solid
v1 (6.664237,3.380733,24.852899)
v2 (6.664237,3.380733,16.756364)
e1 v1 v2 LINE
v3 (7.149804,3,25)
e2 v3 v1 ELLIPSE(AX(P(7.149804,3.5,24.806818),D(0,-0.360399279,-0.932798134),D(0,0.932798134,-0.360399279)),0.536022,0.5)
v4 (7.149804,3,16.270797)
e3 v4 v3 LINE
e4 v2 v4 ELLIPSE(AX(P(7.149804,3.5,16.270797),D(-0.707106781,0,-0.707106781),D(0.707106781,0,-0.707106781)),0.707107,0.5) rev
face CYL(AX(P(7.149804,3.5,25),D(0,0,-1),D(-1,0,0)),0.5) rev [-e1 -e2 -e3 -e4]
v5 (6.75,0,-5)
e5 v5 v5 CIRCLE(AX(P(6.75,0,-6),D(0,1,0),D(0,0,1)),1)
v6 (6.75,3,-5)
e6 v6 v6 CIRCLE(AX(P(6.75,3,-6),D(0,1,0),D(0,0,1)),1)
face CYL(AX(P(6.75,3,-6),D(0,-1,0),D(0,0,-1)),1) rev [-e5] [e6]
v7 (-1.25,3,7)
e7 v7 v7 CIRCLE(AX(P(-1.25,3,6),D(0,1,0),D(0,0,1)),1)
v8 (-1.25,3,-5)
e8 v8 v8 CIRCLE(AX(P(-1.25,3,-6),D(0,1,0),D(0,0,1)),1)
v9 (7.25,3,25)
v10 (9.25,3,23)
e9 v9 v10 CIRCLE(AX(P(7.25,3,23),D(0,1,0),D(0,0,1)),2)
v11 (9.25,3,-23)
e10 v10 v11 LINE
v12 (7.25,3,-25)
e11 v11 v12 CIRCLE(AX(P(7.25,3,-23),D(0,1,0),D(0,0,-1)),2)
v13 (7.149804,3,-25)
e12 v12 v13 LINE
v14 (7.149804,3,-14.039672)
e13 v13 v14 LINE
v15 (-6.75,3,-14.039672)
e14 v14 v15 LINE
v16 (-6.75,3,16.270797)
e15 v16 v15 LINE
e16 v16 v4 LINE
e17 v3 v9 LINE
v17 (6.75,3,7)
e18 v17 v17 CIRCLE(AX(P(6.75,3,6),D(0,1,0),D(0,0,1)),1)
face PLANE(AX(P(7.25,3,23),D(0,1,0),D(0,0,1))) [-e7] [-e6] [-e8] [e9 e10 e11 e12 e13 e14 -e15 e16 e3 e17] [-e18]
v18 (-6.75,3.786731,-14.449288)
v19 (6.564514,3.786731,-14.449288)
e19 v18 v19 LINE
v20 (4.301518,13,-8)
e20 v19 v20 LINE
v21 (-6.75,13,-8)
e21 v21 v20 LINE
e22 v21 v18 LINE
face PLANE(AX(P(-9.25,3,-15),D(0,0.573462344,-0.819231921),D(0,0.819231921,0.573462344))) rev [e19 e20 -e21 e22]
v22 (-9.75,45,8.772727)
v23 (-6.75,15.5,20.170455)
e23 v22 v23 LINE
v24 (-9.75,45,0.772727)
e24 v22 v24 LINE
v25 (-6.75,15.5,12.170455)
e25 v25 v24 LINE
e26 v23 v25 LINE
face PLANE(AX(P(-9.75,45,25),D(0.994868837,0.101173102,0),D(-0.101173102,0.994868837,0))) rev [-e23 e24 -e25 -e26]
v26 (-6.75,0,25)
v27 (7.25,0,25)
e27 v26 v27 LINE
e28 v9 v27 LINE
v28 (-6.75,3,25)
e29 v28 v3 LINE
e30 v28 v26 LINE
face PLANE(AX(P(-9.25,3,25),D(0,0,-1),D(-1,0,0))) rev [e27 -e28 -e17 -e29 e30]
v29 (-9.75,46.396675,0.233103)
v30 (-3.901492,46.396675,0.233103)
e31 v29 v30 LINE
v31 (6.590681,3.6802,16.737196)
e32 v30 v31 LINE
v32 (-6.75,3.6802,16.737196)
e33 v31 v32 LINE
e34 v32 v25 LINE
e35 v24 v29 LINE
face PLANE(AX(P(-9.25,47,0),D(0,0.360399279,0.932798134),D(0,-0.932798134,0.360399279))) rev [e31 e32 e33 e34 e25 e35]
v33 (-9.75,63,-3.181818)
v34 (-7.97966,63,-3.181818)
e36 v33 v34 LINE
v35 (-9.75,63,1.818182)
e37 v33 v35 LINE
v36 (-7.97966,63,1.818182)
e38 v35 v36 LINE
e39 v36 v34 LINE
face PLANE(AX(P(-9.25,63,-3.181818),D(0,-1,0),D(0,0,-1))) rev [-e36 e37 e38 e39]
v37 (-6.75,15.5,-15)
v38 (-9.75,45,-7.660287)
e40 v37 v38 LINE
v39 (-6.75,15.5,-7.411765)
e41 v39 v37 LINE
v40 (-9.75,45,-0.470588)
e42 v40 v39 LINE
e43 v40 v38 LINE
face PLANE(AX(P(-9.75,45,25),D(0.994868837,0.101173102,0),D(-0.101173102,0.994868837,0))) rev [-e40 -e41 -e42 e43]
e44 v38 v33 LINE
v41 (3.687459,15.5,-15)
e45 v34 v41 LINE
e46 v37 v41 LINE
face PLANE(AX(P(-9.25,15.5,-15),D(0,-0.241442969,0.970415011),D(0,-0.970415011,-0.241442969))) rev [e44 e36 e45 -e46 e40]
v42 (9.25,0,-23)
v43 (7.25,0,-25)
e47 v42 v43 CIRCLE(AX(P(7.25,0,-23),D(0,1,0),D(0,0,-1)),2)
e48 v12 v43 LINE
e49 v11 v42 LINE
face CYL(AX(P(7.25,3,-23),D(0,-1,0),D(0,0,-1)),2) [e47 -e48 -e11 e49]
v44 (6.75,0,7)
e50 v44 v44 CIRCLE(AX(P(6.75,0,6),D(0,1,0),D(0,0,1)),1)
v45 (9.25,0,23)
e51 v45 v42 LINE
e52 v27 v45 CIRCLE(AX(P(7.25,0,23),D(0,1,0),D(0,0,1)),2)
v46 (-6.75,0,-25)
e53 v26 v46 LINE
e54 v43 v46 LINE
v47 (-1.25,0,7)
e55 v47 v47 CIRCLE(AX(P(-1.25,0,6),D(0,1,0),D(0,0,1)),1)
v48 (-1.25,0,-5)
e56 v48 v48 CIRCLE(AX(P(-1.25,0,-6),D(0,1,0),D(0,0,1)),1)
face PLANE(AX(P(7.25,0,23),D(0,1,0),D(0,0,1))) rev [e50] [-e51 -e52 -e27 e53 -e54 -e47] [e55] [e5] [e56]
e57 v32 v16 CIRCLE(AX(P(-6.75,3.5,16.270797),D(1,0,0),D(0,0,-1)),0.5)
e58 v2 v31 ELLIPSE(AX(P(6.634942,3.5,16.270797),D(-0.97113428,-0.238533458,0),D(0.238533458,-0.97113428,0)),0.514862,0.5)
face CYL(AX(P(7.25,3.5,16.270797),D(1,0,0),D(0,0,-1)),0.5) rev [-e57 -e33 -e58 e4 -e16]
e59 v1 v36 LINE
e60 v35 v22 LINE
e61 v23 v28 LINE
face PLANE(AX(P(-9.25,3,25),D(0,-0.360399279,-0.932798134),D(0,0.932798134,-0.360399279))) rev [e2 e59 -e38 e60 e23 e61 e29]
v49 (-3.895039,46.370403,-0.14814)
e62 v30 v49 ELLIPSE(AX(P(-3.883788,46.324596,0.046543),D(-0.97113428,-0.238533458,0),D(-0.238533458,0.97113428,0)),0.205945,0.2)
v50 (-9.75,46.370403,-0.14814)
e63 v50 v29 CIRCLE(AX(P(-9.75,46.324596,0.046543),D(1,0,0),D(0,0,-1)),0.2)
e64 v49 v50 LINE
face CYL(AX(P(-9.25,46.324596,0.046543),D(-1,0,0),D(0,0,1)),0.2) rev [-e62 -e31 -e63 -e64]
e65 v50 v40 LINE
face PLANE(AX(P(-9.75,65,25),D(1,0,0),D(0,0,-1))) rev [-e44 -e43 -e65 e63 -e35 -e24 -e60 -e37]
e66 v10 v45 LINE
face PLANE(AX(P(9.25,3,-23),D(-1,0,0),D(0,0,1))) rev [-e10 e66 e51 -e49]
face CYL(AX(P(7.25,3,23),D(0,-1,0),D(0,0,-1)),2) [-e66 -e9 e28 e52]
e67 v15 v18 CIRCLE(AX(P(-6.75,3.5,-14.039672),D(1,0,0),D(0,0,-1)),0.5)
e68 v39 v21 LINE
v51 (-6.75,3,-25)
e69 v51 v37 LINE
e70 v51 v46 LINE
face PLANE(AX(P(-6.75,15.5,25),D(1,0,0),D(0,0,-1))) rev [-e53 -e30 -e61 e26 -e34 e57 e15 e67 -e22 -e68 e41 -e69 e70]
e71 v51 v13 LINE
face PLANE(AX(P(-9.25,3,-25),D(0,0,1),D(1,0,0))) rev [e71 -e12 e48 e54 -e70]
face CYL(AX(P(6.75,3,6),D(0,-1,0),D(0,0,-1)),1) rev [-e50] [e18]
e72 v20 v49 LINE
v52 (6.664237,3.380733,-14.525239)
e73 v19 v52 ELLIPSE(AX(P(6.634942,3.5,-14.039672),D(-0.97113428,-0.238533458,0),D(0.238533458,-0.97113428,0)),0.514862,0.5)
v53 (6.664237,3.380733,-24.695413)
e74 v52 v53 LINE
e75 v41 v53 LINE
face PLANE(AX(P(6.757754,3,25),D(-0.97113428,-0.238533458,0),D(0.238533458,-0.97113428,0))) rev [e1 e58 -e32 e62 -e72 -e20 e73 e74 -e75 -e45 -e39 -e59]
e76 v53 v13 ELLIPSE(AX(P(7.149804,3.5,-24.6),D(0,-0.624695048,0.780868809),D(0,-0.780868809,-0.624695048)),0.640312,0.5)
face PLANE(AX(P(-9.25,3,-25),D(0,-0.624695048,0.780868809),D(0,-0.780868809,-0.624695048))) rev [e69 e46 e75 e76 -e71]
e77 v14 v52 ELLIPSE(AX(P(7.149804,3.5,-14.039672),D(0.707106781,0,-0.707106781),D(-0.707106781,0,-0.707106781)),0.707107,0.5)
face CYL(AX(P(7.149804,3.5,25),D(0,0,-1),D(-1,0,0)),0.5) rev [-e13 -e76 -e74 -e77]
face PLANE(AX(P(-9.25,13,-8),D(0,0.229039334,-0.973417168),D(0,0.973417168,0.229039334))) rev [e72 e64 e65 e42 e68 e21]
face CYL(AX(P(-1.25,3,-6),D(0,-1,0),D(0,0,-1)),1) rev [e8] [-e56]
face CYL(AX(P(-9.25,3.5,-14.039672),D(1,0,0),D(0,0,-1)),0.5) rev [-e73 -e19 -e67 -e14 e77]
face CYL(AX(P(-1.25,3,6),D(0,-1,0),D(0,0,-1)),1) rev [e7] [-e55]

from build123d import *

# Parameters (mm, degrees)
SKETCH_1_R          = 1
EXTRUDE_1_DEPTH     = 3
SKETCH_2_W          = 16.007753667
SKETCH_2_H          = 50
EXTRUDE_2_DEPTH     = 80
CUT_EXTRUDE_1_DEPTH = 89.149011211
CUT_EXTRUDE_2_DEPTH = 81.960252593
EXTRUDE_3_DEPTH     = 3
CUT_EXTRUDE_3_DEPTH = 82.357621032
FILLET_1_R          = 0.5
FILLET_2_R          = 0.2


with BuildPart() as part:
    # 草图1 → 凸台-拉伸1 (new body)
    with BuildSketch(Plane(origin=(0, 0, 0), x_dir=(1, 0, 0), z_dir=(0, 1, 0))):
        with BuildLine():
            Line((-9.25, 25), (7.25, 25))
            ThreePointArc((7.25, 25), (8.664213562, 24.414213562), (9.25, 23))
            Line((9.25, 23), (9.25, -23))
            ThreePointArc((9.25, -23), (8.664213562, -24.414213562), (7.25, -25))
            Line((7.25, -25), (-9.25, -25))
            Line((-9.25, -25), (-9.25, 25))
        make_face()
        with Locations(Location((-1.25, 6, 0), (0, 0, 270))):
            Circle(SKETCH_1_R, mode=Mode.SUBTRACT)
        with Locations(Location((-1.25, -6, 0), (0, 0, 270))):
            Circle(SKETCH_1_R, mode=Mode.SUBTRACT)
        with Locations(Location((6.75, -6, 0), (0, 0, 270))):
            Circle(SKETCH_1_R, mode=Mode.SUBTRACT)
        with Locations(Location((6.75, 6, 0), (0, 0, 270))):
            Circle(SKETCH_1_R, mode=Mode.SUBTRACT)
    extrude(amount=EXTRUDE_1_DEPTH)

    # 草图2 → 凸台-拉伸2 (add)
    with BuildSketch(Plane(origin=(0, 3, 0), x_dir=(1, 0, 0), z_dir=(0, 1, 0))):
        with Locations((-1.246123166, 0)):
            Rectangle(SKETCH_2_W, SKETCH_2_H)
    extrude(amount=EXTRUDE_2_DEPTH)

    # 草图3 → 切除-拉伸1 (cut, through all)
    with BuildSketch(Plane(origin=(6.757753667, 0, 0), x_dir=(0, 0, -1), z_dir=(1, 0, 0))):
        Polygon((0, 47), (-17, 3), (15, 3), (8, 13), align=None)
        Polygon((25, 3), (15, 15.5), (3.181818182, 63), (-1.818181818, 63), (-25, 3), (-37.679958822, 3), (-37.679958822, 88.436899398), (63.328418147, 88.436899398), (63.328418147, 3), align=None)
    extrude(amount=-CUT_EXTRUDE_1_DEPTH, mode=Mode.SUBTRACT)

    # 草图4 → 切除-拉伸2 (cut, through all)
    with BuildSketch(Plane(origin=(0, 0, -25), x_dir=(-1, 0, 0), z_dir=(0, 0, -1))):
        Polygon((-6.757753667, 3), (8.40756476, 64.742116762), (-6.757753667, 64.742116762), align=None)
    extrude(amount=-CUT_EXTRUDE_2_DEPTH, mode=Mode.SUBTRACT)

    # 草图5 → 凸台-拉伸3 (add)
    with BuildSketch(Plane.ZY.offset(9.25)):
        Polygon((-3.181818182, 63), (-15, 15.5), (-25, 3), (-25, 0), (25, 0), (25, 3), (1.818181818, 63), align=None)
        Polygon((0, 47), (-8, 13), (-15, 3), (17, 3), align=None, mode=Mode.SUBTRACT)
    extrude(amount=EXTRUDE_3_DEPTH)

    # 草图6 → 切除-拉伸3 (cut, through all)
    with BuildSketch(Plane(origin=(0, 0, -25), x_dir=(-1, 0, 0), z_dir=(0, 0, -1))):
        Polygon((9.75, 65), (9.75, 45), (6.75, 15.5), (6.75, 0), (15.065136108, 0), (15.065136108, 65), align=None)
    extrude(amount=-CUT_EXTRUDE_3_DEPTH, mode=Mode.SUBTRACT)

    # 圆角1
    # the kernel refuses this fillet: 0.5 mm, written as the material it adds along each edge
    with BuildSketch(Plane(origin=(-6.75, 3, 17), x_dir=(0, 0, -1), z_dir=(1, 0, 0))) as fillet_1_piece_1_section:
        with BuildLine():
            CenterArc((FILLET_1_R * 1.45840694682, FILLET_1_R), FILLET_1_R, 158.875280854, 111.124719146)
            Line((FILLET_1_R * 0.525608812419, FILLET_1_R * 1.3603992792), (0, 0))
            Line((0, 0), (FILLET_1_R * 1.45840694682, 0))
        make_face()
    fillet_1_piece_1 = extrude(amount=15.33076235, mode=Mode.PRIVATE)
    fillet_1_piece_1 = split(fillet_1_piece_1, bisect_by=Plane(origin=(6.334852861, 4.721743663, 16.763347765), z_dir=(-0.9711342799096352, -0.23853345757858446, 0)), keep=Keep.TOP, mode=Mode.PRIVATE)
    add(fillet_1_piece_1)
    with BuildSketch(Plane(origin=(9.158573119, 3, -15), x_dir=(0, 0, 1), z_dir=(-1, 0, 0))) as fillet_1_piece_2_section:
        with BuildLine():
            CenterArc((FILLET_1_R * 1.92065556157, FILLET_1_R), FILLET_1_R, 145.007979801, 124.992020199)
            Line((FILLET_1_R * 1.10142364105, FILLET_1_R * 1.57346234436), (0, 0))
            Line((0, 0), (FILLET_1_R * 1.92065556157, 0))
        make_face()
    fillet_1_piece_2 = extrude(amount=15.908573119, mode=Mode.PRIVATE)
    fillet_1_piece_2 = split(fillet_1_piece_2, bisect_by=Plane(origin=(6.326718063, 4.754862629, -14.622728055), z_dir=(-0.9711342799096352, -0.23853345757858446, 0)), keep=Keep.TOP, mode=Mode.PRIVATE)
    add(fillet_1_piece_2)
    with BuildSketch(Plane(origin=(6.757753667, 3, 16.019874802), x_dir=(1, 0, 0), z_dir=(0, 0, 1))) as fillet_1_piece_3_section:
        with BuildLine():
            CenterArc((FILLET_1_R * 0.784100158108, FILLET_1_R), FILLET_1_R, 193.8, 76.2)
            Line((-FILLET_1_R * 0.187034121801, FILLET_1_R * 0.761466542421), (0, 0))
            Line((0, 0), (FILLET_1_R * 0.784100158108, 0))
        make_face()
    fillet_1_piece_3 = extrude(amount=8.980125198, mode=Mode.PRIVATE)
    fillet_1_piece_3 = split(fillet_1_piece_3, bisect_by=Plane(origin=(6.823760744, 4.428941995, 24.447908775), z_dir=(0, -0.3603992792021625, -0.9327981344055968)), keep=Keep.TOP, mode=Mode.PRIVATE)
    fillet_1_piece_3 = split(fillet_1_piece_3, bisect_by=Plane(origin=(6.823760744, 1.739503793, 17.487009898), z_dir=(0, 0.3603992792021626, 0.9327981344055968)), keep=Keep.TOP, mode=Mode.PRIVATE)
    add(fillet_1_piece_3)
    with BuildSketch(Plane(origin=(6.757753667, 3, -25), x_dir=(1, 0, 0), z_dir=(0, 0, 1))) as fillet_1_piece_4_section:
        with BuildLine():
            CenterArc((FILLET_1_R * 0.784100158108, FILLET_1_R), FILLET_1_R, 193.8, 76.2)
            Line((-FILLET_1_R * 0.187034121801, FILLET_1_R * 0.761466542421), (0, 0))
            Line((0, 0), (FILLET_1_R * 0.784100158108, 0))
        make_face()
    fillet_1_piece_4 = extrude(amount=10.980125198, mode=Mode.PRIVATE)
    fillet_1_piece_4 = split(fillet_1_piece_4, bisect_by=Plane(origin=(6.823819727, 5.521194882, -22.983044095), z_dir=(0, -0.6246950475544241, 0.7808688094430307)), keep=Keep.TOP, mode=Mode.PRIVATE)
    fillet_1_piece_4 = split(fillet_1_piece_4, bisect_by=Plane(origin=(6.823819727, 0.737200979, -16.583959315), z_dir=(0, 0.5734623443633279, -0.819231920519041)), keep=Keep.TOP, mode=Mode.PRIVATE)
    add(fillet_1_piece_4)
    with BuildSketch(Plane(origin=(-6.75, 3, 17), x_dir=(0, 0, -1), z_dir=(1, 0, 0))) as fillet_1_piece_5a_section:
        with BuildLine():
            CenterArc((FILLET_1_R * 1.45840694682, FILLET_1_R), FILLET_1_R, 158.875280854, 111.124719146)
            Line((FILLET_1_R * 0.525608812419, FILLET_1_R * 1.3603992792), (0, 0))
            Line((0, 0), (FILLET_1_R * 1.45840694682, 0))
        make_face()
    fillet_1_piece_5a = extrude(amount=15.33076235, mode=Mode.PRIVATE)
    fillet_1_piece_5a = split(fillet_1_piece_5a, bisect_by=Plane(origin=(6.770254608, 2.949105284, 16.764105763), z_dir=(0.9711342799096352, 0.23853345757858446, 0)), keep=Keep.TOP, mode=Mode.PRIVATE)
    with BuildSketch(Plane(origin=(6.757753667, 3, 16.019874802), x_dir=(1, 0, 0), z_dir=(0, 0, 1))) as fillet_1_piece_5b_section:
        with BuildLine():
            CenterArc((FILLET_1_R * 0.784100158108, FILLET_1_R), FILLET_1_R, 193.8, 76.2)
            Line((-FILLET_1_R * 0.187034121801, FILLET_1_R * 0.761466542421), (0, 0))
            Line((0, 0), (FILLET_1_R * 0.784100158108, 0))
        make_face()
    fillet_1_piece_5b = extrude(amount=8.980125198, mode=Mode.PRIVATE)
    fillet_1_piece_5b = split(fillet_1_piece_5b, bisect_by=Plane(origin=(6.826253209, 3.240744299, 16.906985157), z_dir=(0, -0.3603992792021626, -0.9327981344055968)), keep=Keep.TOP, mode=Mode.PRIVATE)
    fillet_1_piece_5 = fillet_1_piece_5a & fillet_1_piece_5b
    add(fillet_1_piece_5)
    with BuildSketch(Plane(origin=(6.757753667, 3, -25), x_dir=(1, 0, 0), z_dir=(0, 0, 1))) as fillet_1_piece_6a_section:
        with BuildLine():
            CenterArc((FILLET_1_R * 0.784100158108, FILLET_1_R), FILLET_1_R, 193.8, 76.2)
            Line((-FILLET_1_R * 0.187034121801, FILLET_1_R * 0.761466542421), (0, 0))
            Line((0, 0), (FILLET_1_R * 0.784100158108, 0))
        make_face()
    fillet_1_piece_6a = extrude(amount=10.980125198, mode=Mode.PRIVATE)
    fillet_1_piece_6a = split(fillet_1_piece_6a, bisect_by=Plane(origin=(6.828403151, 3.296038352, -14.792773154), z_dir=(0, -0.5734623443633279, 0.819231920519041)), keep=Keep.TOP, mode=Mode.PRIVATE)
    with BuildSketch(Plane(origin=(9.158573119, 3, -15), x_dir=(0, 0, 1), z_dir=(-1, 0, 0))) as fillet_1_piece_6b_section:
        with BuildLine():
            CenterArc((FILLET_1_R * 1.92065556157, FILLET_1_R), FILLET_1_R, 145.007979801, 124.992020199)
            Line((FILLET_1_R * 1.10142364105, FILLET_1_R * 1.57346234436), (0, 0))
            Line((0, 0), (FILLET_1_R * 1.92065556157, 0))
        make_face()
    fillet_1_piece_6b = extrude(amount=15.908573119, mode=Mode.PRIVATE)
    fillet_1_piece_6b = split(fillet_1_piece_6b, bisect_by=Plane(origin=(6.778509417, 2.915497721, -14.622764636), z_dir=(0.9711342799096352, 0.23853345757858446, 0)), keep=Keep.TOP, mode=Mode.PRIVATE)
    fillet_1_piece_6 = fillet_1_piece_6a & fillet_1_piece_6b
    add(fillet_1_piece_6)

    # 圆角2
    fillet_2_edges = [part.edges().sort_by_distance(p)[0] for p in [
        (-6.899841453, 47, 0),
    ]]
    fillet(fillet_2_edges, radius=FILLET_2_R)


solid = part.part
